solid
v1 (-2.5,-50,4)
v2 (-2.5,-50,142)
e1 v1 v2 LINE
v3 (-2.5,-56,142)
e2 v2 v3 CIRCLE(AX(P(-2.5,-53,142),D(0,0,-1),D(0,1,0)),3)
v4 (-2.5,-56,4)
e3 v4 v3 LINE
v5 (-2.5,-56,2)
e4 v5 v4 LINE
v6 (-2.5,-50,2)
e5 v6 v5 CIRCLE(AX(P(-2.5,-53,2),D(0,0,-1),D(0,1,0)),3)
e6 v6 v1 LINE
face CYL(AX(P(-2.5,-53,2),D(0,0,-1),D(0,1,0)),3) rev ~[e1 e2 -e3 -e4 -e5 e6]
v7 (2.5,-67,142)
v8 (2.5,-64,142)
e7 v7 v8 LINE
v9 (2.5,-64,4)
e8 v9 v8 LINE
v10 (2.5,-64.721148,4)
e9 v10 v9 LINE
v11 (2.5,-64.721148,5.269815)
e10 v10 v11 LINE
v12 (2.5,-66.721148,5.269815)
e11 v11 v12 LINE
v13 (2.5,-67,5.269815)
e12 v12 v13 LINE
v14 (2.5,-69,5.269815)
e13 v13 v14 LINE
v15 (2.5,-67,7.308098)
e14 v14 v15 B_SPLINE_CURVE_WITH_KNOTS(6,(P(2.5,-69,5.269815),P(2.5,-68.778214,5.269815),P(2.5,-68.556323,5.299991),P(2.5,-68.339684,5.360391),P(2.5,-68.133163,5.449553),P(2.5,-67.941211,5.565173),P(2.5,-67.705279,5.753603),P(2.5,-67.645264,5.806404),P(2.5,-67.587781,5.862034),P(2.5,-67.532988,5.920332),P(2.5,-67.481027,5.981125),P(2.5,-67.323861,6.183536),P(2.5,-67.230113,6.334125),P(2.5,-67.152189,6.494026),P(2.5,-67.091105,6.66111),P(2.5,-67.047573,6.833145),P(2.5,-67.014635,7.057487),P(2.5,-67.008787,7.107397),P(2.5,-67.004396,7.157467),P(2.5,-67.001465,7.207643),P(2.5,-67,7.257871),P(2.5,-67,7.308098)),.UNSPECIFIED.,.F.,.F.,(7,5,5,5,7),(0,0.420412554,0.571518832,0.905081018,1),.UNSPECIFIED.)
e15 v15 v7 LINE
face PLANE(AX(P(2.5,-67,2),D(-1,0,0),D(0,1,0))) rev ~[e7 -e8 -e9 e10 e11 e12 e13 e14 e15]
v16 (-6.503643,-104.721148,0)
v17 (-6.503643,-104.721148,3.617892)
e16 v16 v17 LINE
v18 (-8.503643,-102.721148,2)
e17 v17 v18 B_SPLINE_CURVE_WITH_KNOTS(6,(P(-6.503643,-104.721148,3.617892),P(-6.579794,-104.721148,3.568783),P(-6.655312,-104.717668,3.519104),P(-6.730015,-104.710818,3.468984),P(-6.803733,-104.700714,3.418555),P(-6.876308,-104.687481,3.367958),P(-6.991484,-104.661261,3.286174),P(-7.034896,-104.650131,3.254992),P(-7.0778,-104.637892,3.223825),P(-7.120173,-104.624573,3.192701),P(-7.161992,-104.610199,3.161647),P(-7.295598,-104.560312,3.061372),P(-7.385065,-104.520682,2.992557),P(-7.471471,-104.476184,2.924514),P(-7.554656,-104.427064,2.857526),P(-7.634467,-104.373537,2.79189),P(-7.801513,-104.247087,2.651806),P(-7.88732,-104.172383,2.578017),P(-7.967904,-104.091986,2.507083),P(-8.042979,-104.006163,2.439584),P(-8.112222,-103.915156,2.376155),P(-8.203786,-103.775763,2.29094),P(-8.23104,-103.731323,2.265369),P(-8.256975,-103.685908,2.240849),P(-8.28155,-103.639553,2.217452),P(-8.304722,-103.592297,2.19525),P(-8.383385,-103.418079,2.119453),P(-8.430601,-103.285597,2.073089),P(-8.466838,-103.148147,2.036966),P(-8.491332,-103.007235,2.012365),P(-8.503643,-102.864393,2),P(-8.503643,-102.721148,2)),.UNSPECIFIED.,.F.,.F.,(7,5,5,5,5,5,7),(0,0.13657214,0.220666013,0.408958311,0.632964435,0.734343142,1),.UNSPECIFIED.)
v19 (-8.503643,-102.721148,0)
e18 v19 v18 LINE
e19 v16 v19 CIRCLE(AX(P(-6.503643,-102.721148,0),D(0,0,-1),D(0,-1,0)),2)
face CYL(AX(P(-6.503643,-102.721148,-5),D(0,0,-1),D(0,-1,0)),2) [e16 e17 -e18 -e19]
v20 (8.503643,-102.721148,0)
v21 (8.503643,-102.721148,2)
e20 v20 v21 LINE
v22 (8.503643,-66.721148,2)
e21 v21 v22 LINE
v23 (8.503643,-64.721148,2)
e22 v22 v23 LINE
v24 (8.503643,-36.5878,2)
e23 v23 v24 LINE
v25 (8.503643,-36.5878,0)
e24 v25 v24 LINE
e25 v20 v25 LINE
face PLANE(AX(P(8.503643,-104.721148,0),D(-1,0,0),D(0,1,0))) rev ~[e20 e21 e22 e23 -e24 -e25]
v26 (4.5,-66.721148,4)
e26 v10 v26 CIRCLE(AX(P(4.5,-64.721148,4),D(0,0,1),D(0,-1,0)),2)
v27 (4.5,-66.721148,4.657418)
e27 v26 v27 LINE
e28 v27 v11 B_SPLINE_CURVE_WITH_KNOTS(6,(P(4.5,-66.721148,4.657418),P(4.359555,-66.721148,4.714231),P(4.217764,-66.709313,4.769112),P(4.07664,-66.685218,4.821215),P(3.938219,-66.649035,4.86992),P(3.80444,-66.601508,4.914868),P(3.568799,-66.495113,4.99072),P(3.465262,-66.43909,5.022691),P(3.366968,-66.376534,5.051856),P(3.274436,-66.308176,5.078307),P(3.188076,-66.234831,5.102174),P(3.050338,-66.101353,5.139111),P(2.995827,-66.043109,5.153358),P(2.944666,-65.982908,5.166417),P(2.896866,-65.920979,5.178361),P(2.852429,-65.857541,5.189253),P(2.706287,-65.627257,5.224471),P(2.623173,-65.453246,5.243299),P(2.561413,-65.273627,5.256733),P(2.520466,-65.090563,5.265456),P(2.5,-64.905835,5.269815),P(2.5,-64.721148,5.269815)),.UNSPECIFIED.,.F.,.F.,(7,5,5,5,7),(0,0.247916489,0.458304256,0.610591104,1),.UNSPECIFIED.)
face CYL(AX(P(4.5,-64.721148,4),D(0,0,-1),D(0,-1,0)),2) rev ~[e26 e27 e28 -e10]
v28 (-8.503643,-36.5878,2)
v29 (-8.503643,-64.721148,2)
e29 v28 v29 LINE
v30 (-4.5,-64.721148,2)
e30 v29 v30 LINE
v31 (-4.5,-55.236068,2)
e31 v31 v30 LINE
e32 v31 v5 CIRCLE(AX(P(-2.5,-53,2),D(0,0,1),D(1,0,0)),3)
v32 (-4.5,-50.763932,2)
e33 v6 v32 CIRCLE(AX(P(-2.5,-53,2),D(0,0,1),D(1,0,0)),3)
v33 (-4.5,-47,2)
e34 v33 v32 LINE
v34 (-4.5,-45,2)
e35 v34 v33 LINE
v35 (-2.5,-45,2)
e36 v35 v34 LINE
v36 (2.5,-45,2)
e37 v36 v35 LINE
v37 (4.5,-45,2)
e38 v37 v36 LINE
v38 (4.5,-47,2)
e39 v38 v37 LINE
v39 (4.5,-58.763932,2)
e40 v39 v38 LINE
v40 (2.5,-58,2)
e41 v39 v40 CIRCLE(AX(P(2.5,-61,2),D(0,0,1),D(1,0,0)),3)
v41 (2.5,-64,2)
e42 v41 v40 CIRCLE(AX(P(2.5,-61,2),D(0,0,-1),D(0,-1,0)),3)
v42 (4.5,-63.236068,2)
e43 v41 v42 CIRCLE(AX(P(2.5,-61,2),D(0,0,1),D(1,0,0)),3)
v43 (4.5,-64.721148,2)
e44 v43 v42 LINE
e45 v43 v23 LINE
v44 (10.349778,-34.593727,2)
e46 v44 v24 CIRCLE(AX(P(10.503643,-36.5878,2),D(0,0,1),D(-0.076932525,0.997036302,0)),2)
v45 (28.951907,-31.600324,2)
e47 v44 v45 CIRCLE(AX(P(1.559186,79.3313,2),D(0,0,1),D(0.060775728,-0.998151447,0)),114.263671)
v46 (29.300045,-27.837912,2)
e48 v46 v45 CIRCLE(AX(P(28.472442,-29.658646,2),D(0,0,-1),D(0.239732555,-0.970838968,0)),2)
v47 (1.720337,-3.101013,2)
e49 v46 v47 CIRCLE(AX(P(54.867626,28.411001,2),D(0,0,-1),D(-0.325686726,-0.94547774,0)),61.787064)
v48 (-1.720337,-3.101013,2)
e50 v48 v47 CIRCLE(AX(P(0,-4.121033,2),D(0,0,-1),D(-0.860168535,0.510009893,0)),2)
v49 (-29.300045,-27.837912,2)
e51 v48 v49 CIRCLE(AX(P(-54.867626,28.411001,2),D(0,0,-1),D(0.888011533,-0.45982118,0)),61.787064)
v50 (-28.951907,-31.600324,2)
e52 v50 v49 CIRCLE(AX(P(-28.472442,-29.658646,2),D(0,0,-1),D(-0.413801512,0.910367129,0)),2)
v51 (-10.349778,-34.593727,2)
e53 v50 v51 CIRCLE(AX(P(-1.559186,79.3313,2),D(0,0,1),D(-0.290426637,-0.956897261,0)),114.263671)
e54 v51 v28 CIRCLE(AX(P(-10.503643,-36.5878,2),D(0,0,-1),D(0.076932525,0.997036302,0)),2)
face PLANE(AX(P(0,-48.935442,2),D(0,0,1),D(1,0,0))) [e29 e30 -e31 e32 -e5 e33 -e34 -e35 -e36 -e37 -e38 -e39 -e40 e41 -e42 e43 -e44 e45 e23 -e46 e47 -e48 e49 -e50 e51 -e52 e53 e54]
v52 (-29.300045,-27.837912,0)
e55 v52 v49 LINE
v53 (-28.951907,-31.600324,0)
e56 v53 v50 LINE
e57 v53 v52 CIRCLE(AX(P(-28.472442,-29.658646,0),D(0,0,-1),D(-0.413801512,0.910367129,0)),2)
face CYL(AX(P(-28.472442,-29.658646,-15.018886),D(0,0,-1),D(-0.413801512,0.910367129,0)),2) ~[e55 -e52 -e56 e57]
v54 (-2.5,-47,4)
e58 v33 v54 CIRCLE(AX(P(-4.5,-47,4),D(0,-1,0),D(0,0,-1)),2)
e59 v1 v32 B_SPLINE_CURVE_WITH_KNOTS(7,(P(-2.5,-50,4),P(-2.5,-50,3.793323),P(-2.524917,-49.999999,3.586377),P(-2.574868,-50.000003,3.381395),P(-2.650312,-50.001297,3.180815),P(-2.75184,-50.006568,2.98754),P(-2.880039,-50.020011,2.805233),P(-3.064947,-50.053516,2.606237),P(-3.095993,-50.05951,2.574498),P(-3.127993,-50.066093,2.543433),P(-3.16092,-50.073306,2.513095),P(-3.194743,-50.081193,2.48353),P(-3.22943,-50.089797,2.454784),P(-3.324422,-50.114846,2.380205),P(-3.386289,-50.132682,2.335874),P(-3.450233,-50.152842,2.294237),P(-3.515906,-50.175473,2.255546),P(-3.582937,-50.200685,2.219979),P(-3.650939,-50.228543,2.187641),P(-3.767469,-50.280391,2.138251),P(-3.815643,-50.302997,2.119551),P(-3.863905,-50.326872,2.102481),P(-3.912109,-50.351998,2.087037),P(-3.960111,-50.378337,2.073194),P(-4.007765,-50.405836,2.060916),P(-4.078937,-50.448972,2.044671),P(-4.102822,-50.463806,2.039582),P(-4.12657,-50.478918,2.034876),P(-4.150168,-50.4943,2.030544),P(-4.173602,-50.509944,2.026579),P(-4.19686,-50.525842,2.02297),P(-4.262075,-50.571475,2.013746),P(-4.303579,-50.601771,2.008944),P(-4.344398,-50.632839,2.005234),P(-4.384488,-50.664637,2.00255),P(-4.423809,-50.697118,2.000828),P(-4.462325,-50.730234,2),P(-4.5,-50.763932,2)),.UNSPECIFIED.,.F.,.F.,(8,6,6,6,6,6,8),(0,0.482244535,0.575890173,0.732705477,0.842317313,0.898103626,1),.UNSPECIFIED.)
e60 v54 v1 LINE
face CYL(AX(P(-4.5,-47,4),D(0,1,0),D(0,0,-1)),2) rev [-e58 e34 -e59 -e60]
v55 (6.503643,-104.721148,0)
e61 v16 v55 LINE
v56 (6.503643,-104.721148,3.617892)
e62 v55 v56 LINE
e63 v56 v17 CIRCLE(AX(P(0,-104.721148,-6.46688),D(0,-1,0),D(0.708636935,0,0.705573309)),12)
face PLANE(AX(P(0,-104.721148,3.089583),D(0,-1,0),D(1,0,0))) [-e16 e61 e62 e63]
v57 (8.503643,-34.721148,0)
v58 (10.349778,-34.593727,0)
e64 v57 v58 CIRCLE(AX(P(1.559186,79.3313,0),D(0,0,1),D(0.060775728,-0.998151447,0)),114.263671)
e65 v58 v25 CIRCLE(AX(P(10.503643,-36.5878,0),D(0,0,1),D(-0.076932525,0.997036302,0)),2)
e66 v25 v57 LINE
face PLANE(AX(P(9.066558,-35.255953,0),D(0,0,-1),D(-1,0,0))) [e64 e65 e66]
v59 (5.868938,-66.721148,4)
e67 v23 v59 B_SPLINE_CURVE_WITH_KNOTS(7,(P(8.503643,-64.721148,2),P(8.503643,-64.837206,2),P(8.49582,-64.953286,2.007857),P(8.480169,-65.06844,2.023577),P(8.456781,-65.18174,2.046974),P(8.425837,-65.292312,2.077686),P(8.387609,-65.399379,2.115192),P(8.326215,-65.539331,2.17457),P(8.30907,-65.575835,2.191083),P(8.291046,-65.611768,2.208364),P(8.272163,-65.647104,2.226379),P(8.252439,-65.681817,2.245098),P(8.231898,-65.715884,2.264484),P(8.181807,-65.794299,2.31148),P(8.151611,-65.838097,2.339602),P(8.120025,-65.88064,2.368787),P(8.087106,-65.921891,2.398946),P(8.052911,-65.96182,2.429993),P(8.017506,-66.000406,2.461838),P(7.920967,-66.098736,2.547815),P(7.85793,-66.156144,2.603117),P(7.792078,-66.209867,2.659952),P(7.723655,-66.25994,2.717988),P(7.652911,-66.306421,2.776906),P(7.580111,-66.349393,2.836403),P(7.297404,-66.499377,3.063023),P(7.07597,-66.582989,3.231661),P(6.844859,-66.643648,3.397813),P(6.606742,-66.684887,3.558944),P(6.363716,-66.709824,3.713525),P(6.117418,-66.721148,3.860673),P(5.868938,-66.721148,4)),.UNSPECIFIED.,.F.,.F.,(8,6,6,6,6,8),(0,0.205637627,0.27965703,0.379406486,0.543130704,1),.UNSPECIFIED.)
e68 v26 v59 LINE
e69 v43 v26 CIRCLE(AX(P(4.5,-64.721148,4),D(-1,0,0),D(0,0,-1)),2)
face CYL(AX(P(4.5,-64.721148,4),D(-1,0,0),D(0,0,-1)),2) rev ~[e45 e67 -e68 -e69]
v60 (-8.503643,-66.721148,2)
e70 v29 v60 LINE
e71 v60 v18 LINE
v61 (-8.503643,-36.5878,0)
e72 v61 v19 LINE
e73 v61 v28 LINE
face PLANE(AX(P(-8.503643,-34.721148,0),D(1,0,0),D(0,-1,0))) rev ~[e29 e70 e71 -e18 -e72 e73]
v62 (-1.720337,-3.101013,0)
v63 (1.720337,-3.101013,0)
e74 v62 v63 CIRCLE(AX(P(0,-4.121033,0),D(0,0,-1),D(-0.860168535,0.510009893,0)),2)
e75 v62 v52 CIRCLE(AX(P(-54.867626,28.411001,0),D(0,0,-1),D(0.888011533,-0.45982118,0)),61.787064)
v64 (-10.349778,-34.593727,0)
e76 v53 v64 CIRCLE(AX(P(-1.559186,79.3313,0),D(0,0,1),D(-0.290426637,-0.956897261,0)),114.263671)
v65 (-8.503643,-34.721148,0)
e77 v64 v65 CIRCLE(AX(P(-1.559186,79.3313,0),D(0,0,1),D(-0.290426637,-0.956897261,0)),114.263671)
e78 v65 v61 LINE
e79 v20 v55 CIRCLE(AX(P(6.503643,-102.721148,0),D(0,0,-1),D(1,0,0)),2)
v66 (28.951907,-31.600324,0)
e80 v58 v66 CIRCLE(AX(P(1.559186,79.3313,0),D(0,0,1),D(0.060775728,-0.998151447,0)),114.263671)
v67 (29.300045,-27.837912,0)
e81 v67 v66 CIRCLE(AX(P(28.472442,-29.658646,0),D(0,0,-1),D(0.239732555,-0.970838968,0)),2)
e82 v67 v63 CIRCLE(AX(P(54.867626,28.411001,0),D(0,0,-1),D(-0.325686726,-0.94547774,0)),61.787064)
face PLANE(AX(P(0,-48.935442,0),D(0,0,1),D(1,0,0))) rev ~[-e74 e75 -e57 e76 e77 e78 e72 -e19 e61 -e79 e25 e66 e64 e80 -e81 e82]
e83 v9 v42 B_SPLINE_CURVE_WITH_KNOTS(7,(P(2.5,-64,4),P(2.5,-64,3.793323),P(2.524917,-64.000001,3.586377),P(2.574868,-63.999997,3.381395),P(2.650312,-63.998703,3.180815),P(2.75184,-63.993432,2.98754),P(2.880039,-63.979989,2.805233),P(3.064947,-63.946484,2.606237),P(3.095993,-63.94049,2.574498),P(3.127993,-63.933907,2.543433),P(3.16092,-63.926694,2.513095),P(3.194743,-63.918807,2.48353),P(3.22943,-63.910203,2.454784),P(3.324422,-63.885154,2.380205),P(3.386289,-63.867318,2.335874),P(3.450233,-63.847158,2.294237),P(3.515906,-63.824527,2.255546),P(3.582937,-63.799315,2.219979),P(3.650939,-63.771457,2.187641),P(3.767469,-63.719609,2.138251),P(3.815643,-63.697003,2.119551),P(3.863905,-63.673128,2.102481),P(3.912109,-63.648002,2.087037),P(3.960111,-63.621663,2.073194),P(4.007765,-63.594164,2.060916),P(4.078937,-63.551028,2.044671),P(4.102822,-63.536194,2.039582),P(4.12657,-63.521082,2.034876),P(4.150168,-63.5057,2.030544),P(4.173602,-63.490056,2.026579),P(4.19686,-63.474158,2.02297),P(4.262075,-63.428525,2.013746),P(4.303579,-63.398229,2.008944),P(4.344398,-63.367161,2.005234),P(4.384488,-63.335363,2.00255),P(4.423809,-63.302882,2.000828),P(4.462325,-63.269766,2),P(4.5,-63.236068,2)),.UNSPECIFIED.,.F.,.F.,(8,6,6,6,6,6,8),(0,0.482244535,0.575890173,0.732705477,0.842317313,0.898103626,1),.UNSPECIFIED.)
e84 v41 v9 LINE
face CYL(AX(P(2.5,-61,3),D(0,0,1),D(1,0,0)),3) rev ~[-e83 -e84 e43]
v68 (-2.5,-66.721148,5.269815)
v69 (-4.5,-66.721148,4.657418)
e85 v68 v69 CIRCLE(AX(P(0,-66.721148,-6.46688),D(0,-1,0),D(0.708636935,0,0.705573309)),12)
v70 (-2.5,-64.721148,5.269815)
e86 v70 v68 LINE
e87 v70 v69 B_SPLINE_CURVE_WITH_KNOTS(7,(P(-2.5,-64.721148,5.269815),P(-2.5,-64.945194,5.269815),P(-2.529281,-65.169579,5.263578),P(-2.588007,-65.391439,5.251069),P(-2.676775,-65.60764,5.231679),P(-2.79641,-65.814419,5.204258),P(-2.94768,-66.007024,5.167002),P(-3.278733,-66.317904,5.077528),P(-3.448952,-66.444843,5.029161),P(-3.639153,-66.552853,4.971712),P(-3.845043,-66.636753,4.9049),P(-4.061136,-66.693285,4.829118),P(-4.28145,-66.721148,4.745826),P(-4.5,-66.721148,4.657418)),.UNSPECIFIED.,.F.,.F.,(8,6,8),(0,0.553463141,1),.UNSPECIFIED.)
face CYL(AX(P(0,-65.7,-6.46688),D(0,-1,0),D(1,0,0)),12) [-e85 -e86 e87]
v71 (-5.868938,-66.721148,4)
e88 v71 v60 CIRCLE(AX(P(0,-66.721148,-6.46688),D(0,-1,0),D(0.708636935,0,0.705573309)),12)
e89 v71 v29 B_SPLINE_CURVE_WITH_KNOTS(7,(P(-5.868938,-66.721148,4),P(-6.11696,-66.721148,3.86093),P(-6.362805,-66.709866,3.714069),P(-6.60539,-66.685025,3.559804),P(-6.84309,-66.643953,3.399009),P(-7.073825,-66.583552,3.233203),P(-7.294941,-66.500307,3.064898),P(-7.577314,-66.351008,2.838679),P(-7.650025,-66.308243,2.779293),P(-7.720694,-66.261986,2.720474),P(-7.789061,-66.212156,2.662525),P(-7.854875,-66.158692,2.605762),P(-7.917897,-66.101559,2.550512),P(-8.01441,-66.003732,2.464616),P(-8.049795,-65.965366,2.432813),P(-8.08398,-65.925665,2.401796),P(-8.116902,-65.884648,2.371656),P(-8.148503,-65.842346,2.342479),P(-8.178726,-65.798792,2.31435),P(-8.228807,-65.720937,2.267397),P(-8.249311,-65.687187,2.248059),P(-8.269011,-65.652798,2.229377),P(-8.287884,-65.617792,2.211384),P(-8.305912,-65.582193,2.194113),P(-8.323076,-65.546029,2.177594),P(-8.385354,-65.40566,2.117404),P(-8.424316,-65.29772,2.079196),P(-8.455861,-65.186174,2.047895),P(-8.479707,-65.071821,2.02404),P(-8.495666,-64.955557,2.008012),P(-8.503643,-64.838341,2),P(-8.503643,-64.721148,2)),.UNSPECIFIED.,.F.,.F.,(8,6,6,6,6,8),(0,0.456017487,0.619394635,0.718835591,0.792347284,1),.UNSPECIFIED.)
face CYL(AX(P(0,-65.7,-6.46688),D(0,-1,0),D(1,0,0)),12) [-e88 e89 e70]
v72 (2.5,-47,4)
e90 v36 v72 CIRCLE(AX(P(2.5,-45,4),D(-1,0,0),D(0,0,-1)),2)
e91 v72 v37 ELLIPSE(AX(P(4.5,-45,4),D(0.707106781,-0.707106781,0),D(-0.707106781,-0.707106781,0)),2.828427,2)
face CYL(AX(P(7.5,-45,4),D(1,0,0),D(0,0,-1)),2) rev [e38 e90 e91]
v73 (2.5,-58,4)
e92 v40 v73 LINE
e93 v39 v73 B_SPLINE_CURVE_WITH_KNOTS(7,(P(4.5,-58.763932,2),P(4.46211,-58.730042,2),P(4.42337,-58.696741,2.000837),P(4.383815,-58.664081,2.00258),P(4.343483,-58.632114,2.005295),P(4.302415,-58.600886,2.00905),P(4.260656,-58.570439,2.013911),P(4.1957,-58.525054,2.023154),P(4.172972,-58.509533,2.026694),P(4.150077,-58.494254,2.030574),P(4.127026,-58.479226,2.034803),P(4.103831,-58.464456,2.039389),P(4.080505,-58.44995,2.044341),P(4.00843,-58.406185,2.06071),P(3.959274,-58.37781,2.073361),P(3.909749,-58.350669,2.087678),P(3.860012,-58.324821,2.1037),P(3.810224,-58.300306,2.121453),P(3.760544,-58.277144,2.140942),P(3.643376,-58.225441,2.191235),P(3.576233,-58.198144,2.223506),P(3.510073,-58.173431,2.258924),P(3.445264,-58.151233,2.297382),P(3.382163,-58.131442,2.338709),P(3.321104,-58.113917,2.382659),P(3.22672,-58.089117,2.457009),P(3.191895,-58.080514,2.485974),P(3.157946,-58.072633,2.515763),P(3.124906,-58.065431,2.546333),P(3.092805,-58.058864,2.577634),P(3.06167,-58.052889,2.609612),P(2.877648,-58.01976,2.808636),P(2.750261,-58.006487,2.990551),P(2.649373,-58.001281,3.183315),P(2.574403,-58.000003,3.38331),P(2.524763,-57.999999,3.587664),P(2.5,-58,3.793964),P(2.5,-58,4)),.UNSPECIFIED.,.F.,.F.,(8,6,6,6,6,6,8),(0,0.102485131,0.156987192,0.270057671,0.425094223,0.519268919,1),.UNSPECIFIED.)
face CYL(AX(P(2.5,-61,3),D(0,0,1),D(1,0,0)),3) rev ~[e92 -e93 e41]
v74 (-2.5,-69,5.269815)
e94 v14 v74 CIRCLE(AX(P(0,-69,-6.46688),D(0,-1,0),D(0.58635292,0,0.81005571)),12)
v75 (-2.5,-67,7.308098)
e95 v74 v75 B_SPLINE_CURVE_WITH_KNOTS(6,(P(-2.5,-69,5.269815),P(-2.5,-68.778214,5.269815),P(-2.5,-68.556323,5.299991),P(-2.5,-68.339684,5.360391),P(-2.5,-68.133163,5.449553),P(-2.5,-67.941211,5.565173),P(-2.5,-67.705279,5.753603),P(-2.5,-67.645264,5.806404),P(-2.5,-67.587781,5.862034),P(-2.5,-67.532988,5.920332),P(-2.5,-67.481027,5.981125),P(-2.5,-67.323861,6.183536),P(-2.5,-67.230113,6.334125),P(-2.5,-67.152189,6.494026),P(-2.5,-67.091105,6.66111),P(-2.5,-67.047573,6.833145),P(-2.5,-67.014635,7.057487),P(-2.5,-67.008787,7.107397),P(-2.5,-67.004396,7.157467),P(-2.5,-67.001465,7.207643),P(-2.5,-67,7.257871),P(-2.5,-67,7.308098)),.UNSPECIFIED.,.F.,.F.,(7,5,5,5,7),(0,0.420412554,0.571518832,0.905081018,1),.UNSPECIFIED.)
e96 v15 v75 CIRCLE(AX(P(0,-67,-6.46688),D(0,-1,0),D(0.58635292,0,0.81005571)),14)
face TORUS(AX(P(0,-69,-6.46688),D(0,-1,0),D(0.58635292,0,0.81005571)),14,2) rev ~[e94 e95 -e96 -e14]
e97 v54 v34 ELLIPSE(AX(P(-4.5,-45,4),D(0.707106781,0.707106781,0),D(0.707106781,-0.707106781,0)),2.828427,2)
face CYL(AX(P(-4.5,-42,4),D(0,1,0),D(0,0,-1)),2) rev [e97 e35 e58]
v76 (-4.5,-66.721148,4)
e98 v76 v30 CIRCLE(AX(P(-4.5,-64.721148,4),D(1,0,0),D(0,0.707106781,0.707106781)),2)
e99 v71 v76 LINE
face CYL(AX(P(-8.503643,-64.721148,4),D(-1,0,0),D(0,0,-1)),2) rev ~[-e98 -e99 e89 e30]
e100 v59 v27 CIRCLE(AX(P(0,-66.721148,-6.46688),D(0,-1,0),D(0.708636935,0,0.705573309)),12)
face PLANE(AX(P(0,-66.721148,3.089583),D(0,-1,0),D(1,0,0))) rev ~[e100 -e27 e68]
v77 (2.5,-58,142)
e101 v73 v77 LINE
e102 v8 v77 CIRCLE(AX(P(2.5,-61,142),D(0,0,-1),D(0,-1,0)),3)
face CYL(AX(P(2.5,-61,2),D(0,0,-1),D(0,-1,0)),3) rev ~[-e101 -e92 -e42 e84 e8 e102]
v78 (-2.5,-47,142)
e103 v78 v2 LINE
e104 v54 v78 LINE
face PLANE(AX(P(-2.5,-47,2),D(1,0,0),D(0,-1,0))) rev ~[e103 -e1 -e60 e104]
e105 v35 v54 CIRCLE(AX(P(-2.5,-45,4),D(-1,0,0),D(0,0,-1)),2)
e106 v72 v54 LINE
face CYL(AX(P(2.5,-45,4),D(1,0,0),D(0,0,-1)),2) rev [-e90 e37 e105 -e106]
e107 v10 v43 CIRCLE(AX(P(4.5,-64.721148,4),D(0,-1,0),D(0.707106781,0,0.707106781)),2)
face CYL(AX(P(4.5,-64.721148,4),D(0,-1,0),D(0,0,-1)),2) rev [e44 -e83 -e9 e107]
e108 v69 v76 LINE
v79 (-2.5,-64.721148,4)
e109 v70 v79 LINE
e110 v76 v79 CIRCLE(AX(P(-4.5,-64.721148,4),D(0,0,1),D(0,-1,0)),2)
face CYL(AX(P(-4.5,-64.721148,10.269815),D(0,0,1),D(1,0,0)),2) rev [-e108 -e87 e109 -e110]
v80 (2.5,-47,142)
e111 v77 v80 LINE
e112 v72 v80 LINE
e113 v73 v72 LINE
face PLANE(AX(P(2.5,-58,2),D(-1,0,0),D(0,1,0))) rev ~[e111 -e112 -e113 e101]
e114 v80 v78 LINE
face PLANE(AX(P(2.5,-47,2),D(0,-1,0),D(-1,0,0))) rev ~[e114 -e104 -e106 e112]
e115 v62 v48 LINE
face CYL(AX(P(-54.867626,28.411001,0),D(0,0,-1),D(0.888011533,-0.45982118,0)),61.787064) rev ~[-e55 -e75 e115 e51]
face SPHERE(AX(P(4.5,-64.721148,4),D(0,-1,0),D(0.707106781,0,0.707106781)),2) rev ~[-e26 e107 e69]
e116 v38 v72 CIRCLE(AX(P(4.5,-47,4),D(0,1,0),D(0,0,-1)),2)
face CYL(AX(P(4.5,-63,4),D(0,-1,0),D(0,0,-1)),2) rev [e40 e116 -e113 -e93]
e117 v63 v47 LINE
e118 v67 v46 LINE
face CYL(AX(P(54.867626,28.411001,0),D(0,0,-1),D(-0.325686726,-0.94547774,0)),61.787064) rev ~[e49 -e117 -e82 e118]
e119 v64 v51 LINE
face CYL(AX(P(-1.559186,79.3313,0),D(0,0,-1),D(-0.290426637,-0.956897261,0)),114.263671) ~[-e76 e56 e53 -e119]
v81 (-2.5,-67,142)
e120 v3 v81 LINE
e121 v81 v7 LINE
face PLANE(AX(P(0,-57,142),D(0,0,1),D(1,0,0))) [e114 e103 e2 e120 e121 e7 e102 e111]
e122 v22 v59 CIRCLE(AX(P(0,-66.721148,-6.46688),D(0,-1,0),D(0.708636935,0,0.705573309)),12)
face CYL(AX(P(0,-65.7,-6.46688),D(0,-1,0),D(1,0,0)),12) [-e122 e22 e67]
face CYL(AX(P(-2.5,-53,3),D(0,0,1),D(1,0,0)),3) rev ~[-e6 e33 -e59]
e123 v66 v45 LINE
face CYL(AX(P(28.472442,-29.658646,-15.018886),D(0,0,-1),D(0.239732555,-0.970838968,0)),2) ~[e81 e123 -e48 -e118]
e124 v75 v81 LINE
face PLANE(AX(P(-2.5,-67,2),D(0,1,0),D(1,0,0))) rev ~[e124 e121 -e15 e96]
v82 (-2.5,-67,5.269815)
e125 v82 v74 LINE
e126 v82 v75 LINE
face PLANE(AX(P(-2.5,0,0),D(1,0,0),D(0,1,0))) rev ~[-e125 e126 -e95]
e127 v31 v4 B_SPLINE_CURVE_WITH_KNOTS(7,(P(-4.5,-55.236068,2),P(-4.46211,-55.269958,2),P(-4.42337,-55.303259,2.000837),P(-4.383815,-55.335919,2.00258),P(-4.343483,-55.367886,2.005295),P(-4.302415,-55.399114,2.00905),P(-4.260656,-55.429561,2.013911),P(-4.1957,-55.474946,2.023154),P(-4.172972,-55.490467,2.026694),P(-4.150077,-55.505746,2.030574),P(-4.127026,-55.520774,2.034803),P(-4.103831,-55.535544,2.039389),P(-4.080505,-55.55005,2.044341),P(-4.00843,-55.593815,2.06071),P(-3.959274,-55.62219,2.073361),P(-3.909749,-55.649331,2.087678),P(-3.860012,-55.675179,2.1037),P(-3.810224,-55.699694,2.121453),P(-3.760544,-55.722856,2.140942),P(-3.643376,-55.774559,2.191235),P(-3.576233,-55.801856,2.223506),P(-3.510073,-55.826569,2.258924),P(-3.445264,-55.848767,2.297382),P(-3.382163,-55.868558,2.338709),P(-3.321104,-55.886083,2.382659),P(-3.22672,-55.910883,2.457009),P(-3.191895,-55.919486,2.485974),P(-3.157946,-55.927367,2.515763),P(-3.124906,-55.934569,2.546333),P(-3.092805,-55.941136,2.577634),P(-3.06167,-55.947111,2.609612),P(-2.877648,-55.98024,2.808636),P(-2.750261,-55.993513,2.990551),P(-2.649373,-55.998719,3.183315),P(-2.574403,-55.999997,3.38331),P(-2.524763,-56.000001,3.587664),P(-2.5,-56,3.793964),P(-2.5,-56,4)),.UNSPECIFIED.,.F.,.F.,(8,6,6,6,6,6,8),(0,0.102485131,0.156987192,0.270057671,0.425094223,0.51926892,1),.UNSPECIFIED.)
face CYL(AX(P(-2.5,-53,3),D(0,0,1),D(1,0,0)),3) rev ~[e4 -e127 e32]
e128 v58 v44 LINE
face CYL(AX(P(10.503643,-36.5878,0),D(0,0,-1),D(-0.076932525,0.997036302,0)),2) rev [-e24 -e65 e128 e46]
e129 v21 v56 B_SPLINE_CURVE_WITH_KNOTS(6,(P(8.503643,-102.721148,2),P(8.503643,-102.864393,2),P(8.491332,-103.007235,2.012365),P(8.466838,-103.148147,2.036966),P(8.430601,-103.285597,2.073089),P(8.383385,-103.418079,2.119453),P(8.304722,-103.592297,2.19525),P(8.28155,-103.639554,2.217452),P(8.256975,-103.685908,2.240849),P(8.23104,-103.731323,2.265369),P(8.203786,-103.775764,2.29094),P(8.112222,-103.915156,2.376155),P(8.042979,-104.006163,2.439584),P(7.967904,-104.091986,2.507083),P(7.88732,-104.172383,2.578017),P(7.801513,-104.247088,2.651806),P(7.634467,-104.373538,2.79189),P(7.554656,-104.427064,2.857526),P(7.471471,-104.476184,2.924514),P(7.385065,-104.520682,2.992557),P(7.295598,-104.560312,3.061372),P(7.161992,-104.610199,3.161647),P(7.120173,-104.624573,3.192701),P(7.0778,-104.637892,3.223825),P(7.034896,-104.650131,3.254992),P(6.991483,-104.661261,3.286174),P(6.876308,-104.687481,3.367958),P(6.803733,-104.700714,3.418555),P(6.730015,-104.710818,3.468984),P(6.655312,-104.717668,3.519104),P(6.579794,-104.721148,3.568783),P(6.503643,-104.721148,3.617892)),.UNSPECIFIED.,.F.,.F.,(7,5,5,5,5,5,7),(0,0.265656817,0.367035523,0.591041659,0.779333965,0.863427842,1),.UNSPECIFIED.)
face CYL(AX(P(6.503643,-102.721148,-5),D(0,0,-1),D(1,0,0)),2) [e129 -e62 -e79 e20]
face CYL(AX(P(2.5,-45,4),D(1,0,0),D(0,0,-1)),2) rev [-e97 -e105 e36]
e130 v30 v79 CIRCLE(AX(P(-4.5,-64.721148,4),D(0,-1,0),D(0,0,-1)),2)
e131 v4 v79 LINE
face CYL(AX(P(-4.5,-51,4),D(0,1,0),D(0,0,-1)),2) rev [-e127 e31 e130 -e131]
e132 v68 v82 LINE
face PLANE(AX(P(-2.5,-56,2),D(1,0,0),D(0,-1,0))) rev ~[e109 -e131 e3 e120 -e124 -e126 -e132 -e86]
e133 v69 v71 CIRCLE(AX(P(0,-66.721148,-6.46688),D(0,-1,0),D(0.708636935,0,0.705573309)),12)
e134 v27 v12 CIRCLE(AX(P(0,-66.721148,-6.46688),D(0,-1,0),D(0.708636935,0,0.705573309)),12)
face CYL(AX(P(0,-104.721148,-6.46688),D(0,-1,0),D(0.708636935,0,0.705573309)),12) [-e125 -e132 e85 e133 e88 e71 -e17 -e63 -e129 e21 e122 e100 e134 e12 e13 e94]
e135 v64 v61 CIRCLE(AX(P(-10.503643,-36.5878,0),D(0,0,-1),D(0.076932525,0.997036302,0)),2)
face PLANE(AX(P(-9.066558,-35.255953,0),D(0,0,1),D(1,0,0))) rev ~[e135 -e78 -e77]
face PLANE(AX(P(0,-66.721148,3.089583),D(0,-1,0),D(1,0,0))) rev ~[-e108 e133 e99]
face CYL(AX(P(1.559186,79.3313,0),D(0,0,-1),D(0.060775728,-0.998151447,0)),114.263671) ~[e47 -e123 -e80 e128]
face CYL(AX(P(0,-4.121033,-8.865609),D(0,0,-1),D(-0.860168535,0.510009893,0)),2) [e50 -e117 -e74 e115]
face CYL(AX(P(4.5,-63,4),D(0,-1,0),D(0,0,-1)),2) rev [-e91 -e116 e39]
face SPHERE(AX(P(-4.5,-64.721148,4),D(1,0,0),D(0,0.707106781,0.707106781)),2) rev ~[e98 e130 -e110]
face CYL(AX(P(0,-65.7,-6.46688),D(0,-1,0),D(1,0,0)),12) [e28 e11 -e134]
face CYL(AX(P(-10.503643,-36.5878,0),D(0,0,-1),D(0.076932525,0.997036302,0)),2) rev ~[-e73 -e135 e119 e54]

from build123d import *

# Parameters (mm, degrees)
F1_DEPTH      = 2
F3_DEPTH      = 140
F5_DEPTH      = 38
F6_S2_W       = 2
F6_S2_H       = 2
F6_T3_DEPTH   = 2
F6_S7_W       = 2
F6_S7_H       = 2
F6_T8_DEPTH   = 2
F6_T13_DEPTH  = 16
F6_S14_R      = 3
F6_T15_DEPTH  = 10
F6_T18_DEPTH  = 8
F6_S19_R      = 3
F6_T20_DEPTH  = 6
F6_T23_DEPTH  = 5
F6_T26_DEPTH  = 2
F6_T29_DEPTH  = 2
F6_T32_DEPTH  = 6.2698148841
F6_S33_R      = 12
F6_T34_DEPTH  = 5
F6_T37_DEPTH  = 4.0036432176
F6_S38_R      = 12
F6_T39_DEPTH  = 4
F6_T42_DEPTH  = 6.2698148841
F6_S43_R      = 12
F6_T44_DEPTH  = 5
F6_T47_DEPTH  = 4.0036432176
F6_S48_R      = 12
F6_T49_DEPTH  = 4
F6_T52_DEPTH  = 13.7211477996
F6_S53_R      = 3
F6_T54_DEPTH  = 9
F6_T57_DEPTH  = 5.7211477996
F6_S58_R      = 3
F6_T59_DEPTH  = 5
F6_T62_ANGLE  = 71.7972504735
F6_T68_DEPTH  = 21
F6_T72_DEPTH  = 10
F6_T78_DEPTH  = 10
F6_T82_DEPTH  = 13
F6_T88_DEPTH  = 12
F6_T91_DEPTH  = 12
F6_T94_DEPTH  = 32.0377713688
F6_T97_DEPTH  = 32.0377713688
F6_T100_DEPTH = 19.7312172526


# Not quite as in the source:
# - a fillet or chamfer that OpenCascade refuses, or shapes differently, is made with other operations: its cross-section is extruded or revolved along the edge and cut away or added


with BuildPart() as f1:
    # F0 (on Top) → F1 (new body)
    with BuildSketch(Plane.XY):
        with BuildLine():
            ThreePointArc((-34.7443990516, -30.0072931229), (-21.7619757905, -33.1321767709), (-8.5036432176, -34.7211477996))
            Line((-8.5036432176, -34.7211477996), (-8.5036432176, -104.7211477996))
            Line((-8.5036432176, -104.7211477996), (0, -104.7211477996))
            Line((0, -104.7211477996), (8.5036432176, -104.7211477996))
            Line((8.5036432176, -104.7211477996), (8.5036432176, -34.7211477996))
            ThreePointArc((8.5036432176, -34.7211477996), (21.7619757905, -33.1321767709), (34.7443990516, -30.0072931229))
            ThreePointArc((34.7443990516, -30.0072931229), (14.4817817228, -18.350360614), (0, 0))
            ThreePointArc((0, 0), (-14.4817817228, -18.350360614), (-34.7443990516, -30.0072931229))
        make_face()
    extrude(amount=F1_DEPTH)

    # F2 (on face) → F3 (join)
    with BuildSketch(Plane.XY.offset(2)):
        with BuildLine():
            Line((-2.5, -67), (2.5, -67))
            Line((2.5, -67), (2.5, -64))
            ThreePointArc((2.5, -64), (-0.5, -61), (2.5, -58))
            Line((2.5, -58), (2.5, -47))
            Line((2.5, -47), (-2.5, -47))
            Line((-2.5, -47), (-2.5, -50))
            ThreePointArc((-2.5, -50), (0.5, -53), (-2.5, -56))
            Line((-2.5, -56), (-2.5, -67))
        make_face()
    extrude(amount=F3_DEPTH)

    # F4 (on face) → F5 (join)
    with BuildSketch(Plane.XZ.offset(104.7211477996)):
        with BuildLine():
            ThreePointArc((8.5036432176, 2), (0, 5.5331202898), (-8.5036432176, 2))
            Line((-8.5036432176, 2), (8.5036432176, 2))
        make_face()
    extrude(amount=-F5_DEPTH)

    # F6: fillet of radius 2 on 17 edges, made by hand


with BuildPart() as f6_tool1:
    # F6_s2 → F6_t3 (new body)
    with BuildSketch(Plane.XZ.offset(64.7211477996)):
        with Locations((3.5, 3)):
            Rectangle(F6_S2_W, F6_S2_H)
    extrude(amount=F6_T3_DEPTH)

    # F6_s4 → F6_t5 (revolve, cut)
    with BuildSketch(Plane(origin=(4.5, -64.7211477996, 4), x_dir=(0.7071067812, 0, 0.7071067812), z_dir=(0.7071067812, 0, -0.7071067812))):
        with BuildLine():
            ThreePointArc((0, -2), (2, 0), (0, 2))
            Line((0, 2), (0, -2))
        make_face()
    revolve(axis=Axis((4.5, -64.7211477996, 4), (0, -1, 0)), mode=Mode.SUBTRACT)


with BuildPart() as f6_tool6:
    # F6_s7 → F6_t8 (new body)
    with BuildSketch(Plane.YZ.offset(-4.5)):
        with Locations((-65.7211477996, 3)):
            Rectangle(F6_S7_W, F6_S7_H)
    extrude(amount=F6_T8_DEPTH)

    # F6_s9 → F6_t10 (revolve, cut)
    with BuildSketch(Plane(origin=(-4.5, -64.7211477996, 4), x_dir=(0, 0.7071067812, 0.7071067812), z_dir=(0, 0.7071067812, -0.7071067812))):
        with BuildLine():
            ThreePointArc((0, -2), (2, 0), (0, 2))
            Line((0, 2), (0, -2))
        make_face()
    revolve(axis=Axis((-4.5, -64.7211477996, 4), (1, 0, 0)), mode=Mode.SUBTRACT)


with BuildPart() as f6_tool11:
    # F6_s12 → F6_t13 (new body)
    with BuildSketch(Plane.XZ.offset(63)):
        with BuildLine():
            ThreePointArc((4.5, 2), (3.0857864376, 2.5857864376), (2.5, 4))
            Line((2.5, 4), (2.5, 2))
            Line((2.5, 2), (4.5, 2))
        make_face()
    extrude(amount=-F6_T13_DEPTH)

    # F6_s14 → F6_t15 (cut, symmetric)
    with BuildSketch(Plane.XY.offset(3)):
        with Locations((2.5, -61)):
            Circle(F6_S14_R)
    extrude(amount=F6_T15_DEPTH, both=True, mode=Mode.SUBTRACT)


with BuildPart() as f6_tool16:
    # F6_s17 → F6_t18 (new body)
    with BuildSketch(Plane.XZ.offset(47)):
        with BuildLine():
            ThreePointArc((-4.5, 2), (-3.0857864376, 2.5857864376), (-2.5, 4))
            Line((-2.5, 4), (-2.5, 2))
            Line((-2.5, 2), (-4.5, 2))
        make_face()
    extrude(amount=F6_T18_DEPTH)

    # F6_s19 → F6_t20 (cut, symmetric)
    with BuildSketch(Plane.XY.offset(3)):
        with Locations((-2.5, -53)):
            Circle(F6_S19_R)
    extrude(amount=F6_T20_DEPTH, both=True, mode=Mode.SUBTRACT)


with BuildPart() as f6_tool21:
    # F6_s22 → F6_t23 (new body)
    with BuildSketch(Plane.YZ.offset(2.5)):
        with BuildLine():
            ThreePointArc((-45, 2), (-46.4142135624, 2.5857864376), (-47, 4))
            Line((-47, 4), (-47, 2))
            Line((-47, 2), (-45, 2))
        make_face()
    extrude(amount=-F6_T23_DEPTH)


with BuildPart() as f6_tool24:
    # F6_s25 → F6_t26 (new body)
    with BuildSketch(Plane.XY):
        with BuildLine():
            ThreePointArc((-10.349778168, -34.5937272007), (-9.0360380086, -35.2290743164), (-8.5036432176, -36.5877998039))
            Line((-8.5036432176, -36.5877998039), (-8.5036432176, -34.7211477996))
            ThreePointArc((-8.5036432176, -34.7211477996), (-9.4269686479, -34.6611748852), (-10.349778168, -34.5937272007))
        make_face()
    extrude(amount=F6_T26_DEPTH)


with BuildPart() as f6_tool27:
    # F6_s28 → F6_t29 (new body)
    with BuildSketch(Plane.XY):
        with BuildLine():
            ThreePointArc((10.349778168, -34.5937272007), (9.0360380086, -35.2290743164), (8.5036432176, -36.5877998039))
            Line((8.5036432176, -36.5877998039), (8.5036432176, -34.7211477996))
            ThreePointArc((8.5036432176, -34.7211477996), (9.4269686479, -34.6611748852), (10.349778168, -34.5937272007))
        make_face()
    extrude(amount=F6_T29_DEPTH)


with BuildPart() as f6_tool30:
    # F6_s31 → F6_t32 (new body)
    with BuildSketch(Plane.XY.offset(4)):
        with BuildLine():
            ThreePointArc((4.5, -66.7211477996), (3.0857864376, -66.135361362), (2.5, -64.7211477996))
            Line((2.5, -64.7211477996), (2.5, -66.7211477996))
            Line((2.5, -66.7211477996), (4.5, -66.7211477996))
        make_face()
    extrude(amount=F6_T32_DEPTH)

    # F6_s33 → F6_t34 (intersect, symmetric)
    with BuildSketch(Plane.XZ.offset(65.7)):
        with Locations((0, -6.4668797102)):
            Circle(F6_S33_R)
    extrude(amount=F6_T34_DEPTH, both=True, mode=Mode.INTERSECT)


with BuildPart() as f6_tool35:
    # F6_s36 → F6_t37 (new body)
    with BuildSketch(Plane.YZ.offset(4.5)):
        with BuildLine():
            ThreePointArc((-64.7211477996, 2), (-66.135361362, 2.5857864376), (-66.7211477996, 4))
            Line((-66.7211477996, 4), (-66.7211477996, 2))
            Line((-66.7211477996, 2), (-64.7211477996, 2))
        make_face()
    extrude(amount=F6_T37_DEPTH)

    # F6_s38 → F6_t39 (intersect, symmetric)
    with BuildSketch(Plane.XZ.offset(65.7)):
        with Locations((0, -6.4668797102)):
            Circle(F6_S38_R)
    extrude(amount=F6_T39_DEPTH, both=True, mode=Mode.INTERSECT)


with BuildPart() as f6_tool40:
    # F6_s41 → F6_t42 (new body)
    with BuildSketch(Plane.XY.offset(10.2698148841)):
        with BuildLine():
            ThreePointArc((-2.5, -64.7211477996), (-3.0857864376, -66.135361362), (-4.5, -66.7211477996))
            Line((-4.5, -66.7211477996), (-2.5, -66.7211477996))
            Line((-2.5, -66.7211477996), (-2.5, -64.7211477996))
        make_face()
    extrude(amount=-F6_T42_DEPTH)

    # F6_s43 → F6_t44 (intersect, symmetric)
    with BuildSketch(Plane.XZ.offset(65.7)):
        with Locations((0, -6.4668797102)):
            Circle(F6_S43_R)
    extrude(amount=F6_T44_DEPTH, both=True, mode=Mode.INTERSECT)


with BuildPart() as f6_tool45:
    # F6_s46 → F6_t47 (new body)
    with BuildSketch(Plane.YZ.offset(-8.5036432176)):
        with BuildLine():
            ThreePointArc((-64.7211477996, 2), (-66.135361362, 2.5857864376), (-66.7211477996, 4))
            Line((-66.7211477996, 4), (-66.7211477996, 2))
            Line((-66.7211477996, 2), (-64.7211477996, 2))
        make_face()
    extrude(amount=F6_T47_DEPTH)

    # F6_s48 → F6_t49 (intersect, symmetric)
    with BuildSketch(Plane.XZ.offset(65.7)):
        with Locations((0, -6.4668797102)):
            Circle(F6_S48_R)
    extrude(amount=F6_T49_DEPTH, both=True, mode=Mode.INTERSECT)


with BuildPart() as f6_tool50:
    # F6_s51 → F6_t52 (new body)
    with BuildSketch(Plane.XZ.offset(51)):
        with BuildLine():
            ThreePointArc((-4.5, 2), (-3.0857864376, 2.5857864376), (-2.5, 4))
            Line((-2.5, 4), (-2.5, 2))
            Line((-2.5, 2), (-4.5, 2))
        make_face()
    extrude(amount=F6_T52_DEPTH)

    # F6_s53 → F6_t54 (cut, symmetric)
    with BuildSketch(Plane.XY.offset(3)):
        with Locations((-2.5, -53)):
            Circle(F6_S53_R)
    extrude(amount=F6_T54_DEPTH, both=True, mode=Mode.SUBTRACT)


with BuildPart() as f6_tool55:
    # F6_s56 → F6_t57 (new body)
    with BuildSketch(Plane.XZ.offset(64.7211477996)):
        with BuildLine():
            ThreePointArc((4.5, 2), (3.0857864376, 2.5857864376), (2.5, 4))
            Line((2.5, 4), (2.5, 2))
            Line((2.5, 2), (4.5, 2))
        make_face()
    extrude(amount=-F6_T57_DEPTH)

    # F6_s58 → F6_t59 (cut, symmetric)
    with BuildSketch(Plane.XY.offset(3)):
        with Locations((2.5, -61)):
            Circle(F6_S58_R)
    extrude(amount=F6_T59_DEPTH, both=True, mode=Mode.SUBTRACT)


with BuildPart() as f6_tool60:
    # F6_s61 → F6_t62 (revolve)
    with BuildSketch(Plane(origin=(3.0716290249, 0, -2.2233762781), x_dir=(0, 1, 0), z_dir=(0.8100557097, 0, -0.5863529203))):
        with BuildLine():
            ThreePointArc((-69, 6.7614671667), (-67.5857864376, 7.3472536043), (-67, 8.7614671667))
            Line((-67, 8.7614671667), (-67, 6.7614671667))
            Line((-67, 6.7614671667), (-69, 6.7614671667))
        make_face()
    revolve(axis=Axis((0, -67, -6.4668797102), (0, -1, 0)), revolution_arc=F6_T62_ANGLE)

    split(bisect_by=Plane.YZ.offset(2.5), keep=Keep.BOTTOM)

    split(bisect_by=Plane.YZ.offset(-2.5), keep=Keep.TOP)


with BuildPart() as f6_tool66:
    # F6_s67 → F6_t68 (new body)
    with BuildSketch(Plane.XZ.offset(63)):
        with BuildLine():
            ThreePointArc((4.5, 2), (3.0857864376, 2.5857864376), (2.5, 4))
            Line((2.5, 4), (2.5, 2))
            Line((2.5, 2), (4.5, 2))
        make_face()
    extrude(amount=-F6_T68_DEPTH)

    split(bisect_by=Plane.XZ.offset(47), keep=Keep.BOTTOM)


with BuildPart() as f6_tool70:
    # F6_s71 → F6_t72 (new body)
    with BuildSketch(Plane.YZ.offset(7.5)):
        with BuildLine():
            ThreePointArc((-45, 2), (-46.4142135624, 2.5857864376), (-47, 4))
            Line((-47, 4), (-47, 2))
            Line((-47, 2), (-45, 2))
        make_face()
    extrude(amount=-F6_T72_DEPTH)

    split(bisect_by=Plane.YZ.offset(2.5), keep=Keep.TOP)


with BuildPart() as f6_tool66_1:
    add(f6_tool66.part)

    # F6_t74: intersect F6_tool70
    add(f6_tool70.part, mode=Mode.INTERSECT)


with BuildPart() as f6_tool76:
    # F6_s77 → F6_t78 (new body)
    with BuildSketch(Plane.YZ.offset(2.5)):
        with BuildLine():
            ThreePointArc((-45, 2), (-46.4142135624, 2.5857864376), (-47, 4))
            Line((-47, 4), (-47, 2))
            Line((-47, 2), (-45, 2))
        make_face()
    extrude(amount=-F6_T78_DEPTH)

    split(bisect_by=Plane.YZ.offset(-2.5), keep=Keep.BOTTOM)


with BuildPart() as f6_tool80:
    # F6_s81 → F6_t82 (new body)
    with BuildSketch(Plane.XZ.offset(42)):
        with BuildLine():
            ThreePointArc((-4.5, 2), (-3.0857864376, 2.5857864376), (-2.5, 4))
            Line((-2.5, 4), (-2.5, 2))
            Line((-2.5, 2), (-4.5, 2))
        make_face()
    extrude(amount=F6_T82_DEPTH)

    split(bisect_by=Plane.XZ.offset(47), keep=Keep.BOTTOM)


with BuildPart() as f6_tool76_1:
    add(f6_tool76.part)

    # F6_t84: intersect F6_tool80
    add(f6_tool80.part, mode=Mode.INTERSECT)


with BuildPart() as f1_1:
    add(f1.part)

    # F6_t85: union F6_tool1, F6_tool6, F6_tool11, F6_tool16, F6_tool21, F6_tool24, F6_tool27, F6_tool30, F6_tool35, F6_tool40, F6_tool45, F6_tool50, F6_tool55, F6_tool60, F6_tool66, F6_tool76
    add([f6_tool1.part, f6_tool6.part, f6_tool11.part, f6_tool16.part, f6_tool21.part, f6_tool24.part, f6_tool27.part, f6_tool30.part, f6_tool35.part, f6_tool40.part, f6_tool45.part, f6_tool50.part, f6_tool55.part, f6_tool60.part, f6_tool66_1.part, f6_tool76_1.part])


with BuildPart() as f6_tool86:
    # F6_s87 → F6_t88 (new body)
    with BuildSketch(Plane.XY.offset(-5)):
        with BuildLine():
            ThreePointArc((-6.5036432176, -104.7211477996), (-7.91785678, -104.135361362), (-8.5036432176, -102.7211477996))
            Line((-8.5036432176, -102.7211477996), (-8.5036432176, -104.7211477996))
            Line((-8.5036432176, -104.7211477996), (-6.5036432176, -104.7211477996))
        make_face()
    extrude(amount=F6_T88_DEPTH)


with BuildPart() as f6_tool89:
    # F6_s90 → F6_t91 (new body)
    with BuildSketch(Plane.XY.offset(-5)):
        with BuildLine():
            ThreePointArc((8.5036432176, -102.7211477996), (7.91785678, -104.135361362), (6.5036432176, -104.7211477996))
            Line((6.5036432176, -104.7211477996), (8.5036432176, -104.7211477996))
            Line((8.5036432176, -104.7211477996), (8.5036432176, -102.7211477996))
        make_face()
    extrude(amount=F6_T91_DEPTH)


with BuildPart() as f6_tool92:
    # F6_s93 → F6_t94 (new body)
    with BuildSketch(Plane.XY.offset(-15.0188856844)):
        with BuildLine():
            ThreePointArc((28.9519071991, -31.6003237222), (30.4639347839, -29.8429196175), (29.300045112, -27.8379115286))
            ThreePointArc((29.300045112, -27.8379115286), (31.9964862312, -28.987189893), (34.7443990516, -30.0072931229))
            ThreePointArc((34.7443990516, -30.0072931229), (31.8586243798, -30.8418834327), (28.9519071991, -31.6003237222))
        make_face()
    extrude(amount=F6_T94_DEPTH)


with BuildPart() as f6_tool95:
    # F6_s96 → F6_t97 (new body)
    with BuildSketch(Plane.XY.offset(-15.0188856844)):
        with BuildLine():
            ThreePointArc((-29.300045112, -27.8379115286), (-30.4639347839, -29.8429196175), (-28.9519071991, -31.6003237222))
            ThreePointArc((-28.9519071991, -31.6003237222), (-31.8586243798, -30.8418834327), (-34.7443990516, -30.0072931229))
            ThreePointArc((-34.7443990516, -30.0072931229), (-31.9964862312, -28.987189893), (-29.300045112, -27.8379115286))
        make_face()
    extrude(amount=F6_T97_DEPTH)


with BuildPart() as f6_tool98:
    # F6_s99 → F6_t100 (new body)
    with BuildSketch(Plane.XY.offset(-8.8656086263)):
        with BuildLine():
            ThreePointArc((-1.7203370706, -3.1010132173), (0, -2.1210330032), (1.7203370706, -3.1010132173))
            ThreePointArc((1.7203370706, -3.1010132173), (0.8379162788, -1.5628514066), (0, 0))
            ThreePointArc((0, 0), (-0.8379162788, -1.5628514066), (-1.7203370706, -3.1010132173))
        make_face()
    extrude(amount=F6_T100_DEPTH)


with BuildPart() as f1_2:
    add(f1_1.part)

    # F6_t101: cut F6_tool86, F6_tool89, F6_tool92, F6_tool95, F6_tool98
    add([f6_tool86.part, f6_tool89.part, f6_tool92.part, f6_tool95.part, f6_tool98.part], mode=Mode.SUBTRACT)


solid = f1_2.part
